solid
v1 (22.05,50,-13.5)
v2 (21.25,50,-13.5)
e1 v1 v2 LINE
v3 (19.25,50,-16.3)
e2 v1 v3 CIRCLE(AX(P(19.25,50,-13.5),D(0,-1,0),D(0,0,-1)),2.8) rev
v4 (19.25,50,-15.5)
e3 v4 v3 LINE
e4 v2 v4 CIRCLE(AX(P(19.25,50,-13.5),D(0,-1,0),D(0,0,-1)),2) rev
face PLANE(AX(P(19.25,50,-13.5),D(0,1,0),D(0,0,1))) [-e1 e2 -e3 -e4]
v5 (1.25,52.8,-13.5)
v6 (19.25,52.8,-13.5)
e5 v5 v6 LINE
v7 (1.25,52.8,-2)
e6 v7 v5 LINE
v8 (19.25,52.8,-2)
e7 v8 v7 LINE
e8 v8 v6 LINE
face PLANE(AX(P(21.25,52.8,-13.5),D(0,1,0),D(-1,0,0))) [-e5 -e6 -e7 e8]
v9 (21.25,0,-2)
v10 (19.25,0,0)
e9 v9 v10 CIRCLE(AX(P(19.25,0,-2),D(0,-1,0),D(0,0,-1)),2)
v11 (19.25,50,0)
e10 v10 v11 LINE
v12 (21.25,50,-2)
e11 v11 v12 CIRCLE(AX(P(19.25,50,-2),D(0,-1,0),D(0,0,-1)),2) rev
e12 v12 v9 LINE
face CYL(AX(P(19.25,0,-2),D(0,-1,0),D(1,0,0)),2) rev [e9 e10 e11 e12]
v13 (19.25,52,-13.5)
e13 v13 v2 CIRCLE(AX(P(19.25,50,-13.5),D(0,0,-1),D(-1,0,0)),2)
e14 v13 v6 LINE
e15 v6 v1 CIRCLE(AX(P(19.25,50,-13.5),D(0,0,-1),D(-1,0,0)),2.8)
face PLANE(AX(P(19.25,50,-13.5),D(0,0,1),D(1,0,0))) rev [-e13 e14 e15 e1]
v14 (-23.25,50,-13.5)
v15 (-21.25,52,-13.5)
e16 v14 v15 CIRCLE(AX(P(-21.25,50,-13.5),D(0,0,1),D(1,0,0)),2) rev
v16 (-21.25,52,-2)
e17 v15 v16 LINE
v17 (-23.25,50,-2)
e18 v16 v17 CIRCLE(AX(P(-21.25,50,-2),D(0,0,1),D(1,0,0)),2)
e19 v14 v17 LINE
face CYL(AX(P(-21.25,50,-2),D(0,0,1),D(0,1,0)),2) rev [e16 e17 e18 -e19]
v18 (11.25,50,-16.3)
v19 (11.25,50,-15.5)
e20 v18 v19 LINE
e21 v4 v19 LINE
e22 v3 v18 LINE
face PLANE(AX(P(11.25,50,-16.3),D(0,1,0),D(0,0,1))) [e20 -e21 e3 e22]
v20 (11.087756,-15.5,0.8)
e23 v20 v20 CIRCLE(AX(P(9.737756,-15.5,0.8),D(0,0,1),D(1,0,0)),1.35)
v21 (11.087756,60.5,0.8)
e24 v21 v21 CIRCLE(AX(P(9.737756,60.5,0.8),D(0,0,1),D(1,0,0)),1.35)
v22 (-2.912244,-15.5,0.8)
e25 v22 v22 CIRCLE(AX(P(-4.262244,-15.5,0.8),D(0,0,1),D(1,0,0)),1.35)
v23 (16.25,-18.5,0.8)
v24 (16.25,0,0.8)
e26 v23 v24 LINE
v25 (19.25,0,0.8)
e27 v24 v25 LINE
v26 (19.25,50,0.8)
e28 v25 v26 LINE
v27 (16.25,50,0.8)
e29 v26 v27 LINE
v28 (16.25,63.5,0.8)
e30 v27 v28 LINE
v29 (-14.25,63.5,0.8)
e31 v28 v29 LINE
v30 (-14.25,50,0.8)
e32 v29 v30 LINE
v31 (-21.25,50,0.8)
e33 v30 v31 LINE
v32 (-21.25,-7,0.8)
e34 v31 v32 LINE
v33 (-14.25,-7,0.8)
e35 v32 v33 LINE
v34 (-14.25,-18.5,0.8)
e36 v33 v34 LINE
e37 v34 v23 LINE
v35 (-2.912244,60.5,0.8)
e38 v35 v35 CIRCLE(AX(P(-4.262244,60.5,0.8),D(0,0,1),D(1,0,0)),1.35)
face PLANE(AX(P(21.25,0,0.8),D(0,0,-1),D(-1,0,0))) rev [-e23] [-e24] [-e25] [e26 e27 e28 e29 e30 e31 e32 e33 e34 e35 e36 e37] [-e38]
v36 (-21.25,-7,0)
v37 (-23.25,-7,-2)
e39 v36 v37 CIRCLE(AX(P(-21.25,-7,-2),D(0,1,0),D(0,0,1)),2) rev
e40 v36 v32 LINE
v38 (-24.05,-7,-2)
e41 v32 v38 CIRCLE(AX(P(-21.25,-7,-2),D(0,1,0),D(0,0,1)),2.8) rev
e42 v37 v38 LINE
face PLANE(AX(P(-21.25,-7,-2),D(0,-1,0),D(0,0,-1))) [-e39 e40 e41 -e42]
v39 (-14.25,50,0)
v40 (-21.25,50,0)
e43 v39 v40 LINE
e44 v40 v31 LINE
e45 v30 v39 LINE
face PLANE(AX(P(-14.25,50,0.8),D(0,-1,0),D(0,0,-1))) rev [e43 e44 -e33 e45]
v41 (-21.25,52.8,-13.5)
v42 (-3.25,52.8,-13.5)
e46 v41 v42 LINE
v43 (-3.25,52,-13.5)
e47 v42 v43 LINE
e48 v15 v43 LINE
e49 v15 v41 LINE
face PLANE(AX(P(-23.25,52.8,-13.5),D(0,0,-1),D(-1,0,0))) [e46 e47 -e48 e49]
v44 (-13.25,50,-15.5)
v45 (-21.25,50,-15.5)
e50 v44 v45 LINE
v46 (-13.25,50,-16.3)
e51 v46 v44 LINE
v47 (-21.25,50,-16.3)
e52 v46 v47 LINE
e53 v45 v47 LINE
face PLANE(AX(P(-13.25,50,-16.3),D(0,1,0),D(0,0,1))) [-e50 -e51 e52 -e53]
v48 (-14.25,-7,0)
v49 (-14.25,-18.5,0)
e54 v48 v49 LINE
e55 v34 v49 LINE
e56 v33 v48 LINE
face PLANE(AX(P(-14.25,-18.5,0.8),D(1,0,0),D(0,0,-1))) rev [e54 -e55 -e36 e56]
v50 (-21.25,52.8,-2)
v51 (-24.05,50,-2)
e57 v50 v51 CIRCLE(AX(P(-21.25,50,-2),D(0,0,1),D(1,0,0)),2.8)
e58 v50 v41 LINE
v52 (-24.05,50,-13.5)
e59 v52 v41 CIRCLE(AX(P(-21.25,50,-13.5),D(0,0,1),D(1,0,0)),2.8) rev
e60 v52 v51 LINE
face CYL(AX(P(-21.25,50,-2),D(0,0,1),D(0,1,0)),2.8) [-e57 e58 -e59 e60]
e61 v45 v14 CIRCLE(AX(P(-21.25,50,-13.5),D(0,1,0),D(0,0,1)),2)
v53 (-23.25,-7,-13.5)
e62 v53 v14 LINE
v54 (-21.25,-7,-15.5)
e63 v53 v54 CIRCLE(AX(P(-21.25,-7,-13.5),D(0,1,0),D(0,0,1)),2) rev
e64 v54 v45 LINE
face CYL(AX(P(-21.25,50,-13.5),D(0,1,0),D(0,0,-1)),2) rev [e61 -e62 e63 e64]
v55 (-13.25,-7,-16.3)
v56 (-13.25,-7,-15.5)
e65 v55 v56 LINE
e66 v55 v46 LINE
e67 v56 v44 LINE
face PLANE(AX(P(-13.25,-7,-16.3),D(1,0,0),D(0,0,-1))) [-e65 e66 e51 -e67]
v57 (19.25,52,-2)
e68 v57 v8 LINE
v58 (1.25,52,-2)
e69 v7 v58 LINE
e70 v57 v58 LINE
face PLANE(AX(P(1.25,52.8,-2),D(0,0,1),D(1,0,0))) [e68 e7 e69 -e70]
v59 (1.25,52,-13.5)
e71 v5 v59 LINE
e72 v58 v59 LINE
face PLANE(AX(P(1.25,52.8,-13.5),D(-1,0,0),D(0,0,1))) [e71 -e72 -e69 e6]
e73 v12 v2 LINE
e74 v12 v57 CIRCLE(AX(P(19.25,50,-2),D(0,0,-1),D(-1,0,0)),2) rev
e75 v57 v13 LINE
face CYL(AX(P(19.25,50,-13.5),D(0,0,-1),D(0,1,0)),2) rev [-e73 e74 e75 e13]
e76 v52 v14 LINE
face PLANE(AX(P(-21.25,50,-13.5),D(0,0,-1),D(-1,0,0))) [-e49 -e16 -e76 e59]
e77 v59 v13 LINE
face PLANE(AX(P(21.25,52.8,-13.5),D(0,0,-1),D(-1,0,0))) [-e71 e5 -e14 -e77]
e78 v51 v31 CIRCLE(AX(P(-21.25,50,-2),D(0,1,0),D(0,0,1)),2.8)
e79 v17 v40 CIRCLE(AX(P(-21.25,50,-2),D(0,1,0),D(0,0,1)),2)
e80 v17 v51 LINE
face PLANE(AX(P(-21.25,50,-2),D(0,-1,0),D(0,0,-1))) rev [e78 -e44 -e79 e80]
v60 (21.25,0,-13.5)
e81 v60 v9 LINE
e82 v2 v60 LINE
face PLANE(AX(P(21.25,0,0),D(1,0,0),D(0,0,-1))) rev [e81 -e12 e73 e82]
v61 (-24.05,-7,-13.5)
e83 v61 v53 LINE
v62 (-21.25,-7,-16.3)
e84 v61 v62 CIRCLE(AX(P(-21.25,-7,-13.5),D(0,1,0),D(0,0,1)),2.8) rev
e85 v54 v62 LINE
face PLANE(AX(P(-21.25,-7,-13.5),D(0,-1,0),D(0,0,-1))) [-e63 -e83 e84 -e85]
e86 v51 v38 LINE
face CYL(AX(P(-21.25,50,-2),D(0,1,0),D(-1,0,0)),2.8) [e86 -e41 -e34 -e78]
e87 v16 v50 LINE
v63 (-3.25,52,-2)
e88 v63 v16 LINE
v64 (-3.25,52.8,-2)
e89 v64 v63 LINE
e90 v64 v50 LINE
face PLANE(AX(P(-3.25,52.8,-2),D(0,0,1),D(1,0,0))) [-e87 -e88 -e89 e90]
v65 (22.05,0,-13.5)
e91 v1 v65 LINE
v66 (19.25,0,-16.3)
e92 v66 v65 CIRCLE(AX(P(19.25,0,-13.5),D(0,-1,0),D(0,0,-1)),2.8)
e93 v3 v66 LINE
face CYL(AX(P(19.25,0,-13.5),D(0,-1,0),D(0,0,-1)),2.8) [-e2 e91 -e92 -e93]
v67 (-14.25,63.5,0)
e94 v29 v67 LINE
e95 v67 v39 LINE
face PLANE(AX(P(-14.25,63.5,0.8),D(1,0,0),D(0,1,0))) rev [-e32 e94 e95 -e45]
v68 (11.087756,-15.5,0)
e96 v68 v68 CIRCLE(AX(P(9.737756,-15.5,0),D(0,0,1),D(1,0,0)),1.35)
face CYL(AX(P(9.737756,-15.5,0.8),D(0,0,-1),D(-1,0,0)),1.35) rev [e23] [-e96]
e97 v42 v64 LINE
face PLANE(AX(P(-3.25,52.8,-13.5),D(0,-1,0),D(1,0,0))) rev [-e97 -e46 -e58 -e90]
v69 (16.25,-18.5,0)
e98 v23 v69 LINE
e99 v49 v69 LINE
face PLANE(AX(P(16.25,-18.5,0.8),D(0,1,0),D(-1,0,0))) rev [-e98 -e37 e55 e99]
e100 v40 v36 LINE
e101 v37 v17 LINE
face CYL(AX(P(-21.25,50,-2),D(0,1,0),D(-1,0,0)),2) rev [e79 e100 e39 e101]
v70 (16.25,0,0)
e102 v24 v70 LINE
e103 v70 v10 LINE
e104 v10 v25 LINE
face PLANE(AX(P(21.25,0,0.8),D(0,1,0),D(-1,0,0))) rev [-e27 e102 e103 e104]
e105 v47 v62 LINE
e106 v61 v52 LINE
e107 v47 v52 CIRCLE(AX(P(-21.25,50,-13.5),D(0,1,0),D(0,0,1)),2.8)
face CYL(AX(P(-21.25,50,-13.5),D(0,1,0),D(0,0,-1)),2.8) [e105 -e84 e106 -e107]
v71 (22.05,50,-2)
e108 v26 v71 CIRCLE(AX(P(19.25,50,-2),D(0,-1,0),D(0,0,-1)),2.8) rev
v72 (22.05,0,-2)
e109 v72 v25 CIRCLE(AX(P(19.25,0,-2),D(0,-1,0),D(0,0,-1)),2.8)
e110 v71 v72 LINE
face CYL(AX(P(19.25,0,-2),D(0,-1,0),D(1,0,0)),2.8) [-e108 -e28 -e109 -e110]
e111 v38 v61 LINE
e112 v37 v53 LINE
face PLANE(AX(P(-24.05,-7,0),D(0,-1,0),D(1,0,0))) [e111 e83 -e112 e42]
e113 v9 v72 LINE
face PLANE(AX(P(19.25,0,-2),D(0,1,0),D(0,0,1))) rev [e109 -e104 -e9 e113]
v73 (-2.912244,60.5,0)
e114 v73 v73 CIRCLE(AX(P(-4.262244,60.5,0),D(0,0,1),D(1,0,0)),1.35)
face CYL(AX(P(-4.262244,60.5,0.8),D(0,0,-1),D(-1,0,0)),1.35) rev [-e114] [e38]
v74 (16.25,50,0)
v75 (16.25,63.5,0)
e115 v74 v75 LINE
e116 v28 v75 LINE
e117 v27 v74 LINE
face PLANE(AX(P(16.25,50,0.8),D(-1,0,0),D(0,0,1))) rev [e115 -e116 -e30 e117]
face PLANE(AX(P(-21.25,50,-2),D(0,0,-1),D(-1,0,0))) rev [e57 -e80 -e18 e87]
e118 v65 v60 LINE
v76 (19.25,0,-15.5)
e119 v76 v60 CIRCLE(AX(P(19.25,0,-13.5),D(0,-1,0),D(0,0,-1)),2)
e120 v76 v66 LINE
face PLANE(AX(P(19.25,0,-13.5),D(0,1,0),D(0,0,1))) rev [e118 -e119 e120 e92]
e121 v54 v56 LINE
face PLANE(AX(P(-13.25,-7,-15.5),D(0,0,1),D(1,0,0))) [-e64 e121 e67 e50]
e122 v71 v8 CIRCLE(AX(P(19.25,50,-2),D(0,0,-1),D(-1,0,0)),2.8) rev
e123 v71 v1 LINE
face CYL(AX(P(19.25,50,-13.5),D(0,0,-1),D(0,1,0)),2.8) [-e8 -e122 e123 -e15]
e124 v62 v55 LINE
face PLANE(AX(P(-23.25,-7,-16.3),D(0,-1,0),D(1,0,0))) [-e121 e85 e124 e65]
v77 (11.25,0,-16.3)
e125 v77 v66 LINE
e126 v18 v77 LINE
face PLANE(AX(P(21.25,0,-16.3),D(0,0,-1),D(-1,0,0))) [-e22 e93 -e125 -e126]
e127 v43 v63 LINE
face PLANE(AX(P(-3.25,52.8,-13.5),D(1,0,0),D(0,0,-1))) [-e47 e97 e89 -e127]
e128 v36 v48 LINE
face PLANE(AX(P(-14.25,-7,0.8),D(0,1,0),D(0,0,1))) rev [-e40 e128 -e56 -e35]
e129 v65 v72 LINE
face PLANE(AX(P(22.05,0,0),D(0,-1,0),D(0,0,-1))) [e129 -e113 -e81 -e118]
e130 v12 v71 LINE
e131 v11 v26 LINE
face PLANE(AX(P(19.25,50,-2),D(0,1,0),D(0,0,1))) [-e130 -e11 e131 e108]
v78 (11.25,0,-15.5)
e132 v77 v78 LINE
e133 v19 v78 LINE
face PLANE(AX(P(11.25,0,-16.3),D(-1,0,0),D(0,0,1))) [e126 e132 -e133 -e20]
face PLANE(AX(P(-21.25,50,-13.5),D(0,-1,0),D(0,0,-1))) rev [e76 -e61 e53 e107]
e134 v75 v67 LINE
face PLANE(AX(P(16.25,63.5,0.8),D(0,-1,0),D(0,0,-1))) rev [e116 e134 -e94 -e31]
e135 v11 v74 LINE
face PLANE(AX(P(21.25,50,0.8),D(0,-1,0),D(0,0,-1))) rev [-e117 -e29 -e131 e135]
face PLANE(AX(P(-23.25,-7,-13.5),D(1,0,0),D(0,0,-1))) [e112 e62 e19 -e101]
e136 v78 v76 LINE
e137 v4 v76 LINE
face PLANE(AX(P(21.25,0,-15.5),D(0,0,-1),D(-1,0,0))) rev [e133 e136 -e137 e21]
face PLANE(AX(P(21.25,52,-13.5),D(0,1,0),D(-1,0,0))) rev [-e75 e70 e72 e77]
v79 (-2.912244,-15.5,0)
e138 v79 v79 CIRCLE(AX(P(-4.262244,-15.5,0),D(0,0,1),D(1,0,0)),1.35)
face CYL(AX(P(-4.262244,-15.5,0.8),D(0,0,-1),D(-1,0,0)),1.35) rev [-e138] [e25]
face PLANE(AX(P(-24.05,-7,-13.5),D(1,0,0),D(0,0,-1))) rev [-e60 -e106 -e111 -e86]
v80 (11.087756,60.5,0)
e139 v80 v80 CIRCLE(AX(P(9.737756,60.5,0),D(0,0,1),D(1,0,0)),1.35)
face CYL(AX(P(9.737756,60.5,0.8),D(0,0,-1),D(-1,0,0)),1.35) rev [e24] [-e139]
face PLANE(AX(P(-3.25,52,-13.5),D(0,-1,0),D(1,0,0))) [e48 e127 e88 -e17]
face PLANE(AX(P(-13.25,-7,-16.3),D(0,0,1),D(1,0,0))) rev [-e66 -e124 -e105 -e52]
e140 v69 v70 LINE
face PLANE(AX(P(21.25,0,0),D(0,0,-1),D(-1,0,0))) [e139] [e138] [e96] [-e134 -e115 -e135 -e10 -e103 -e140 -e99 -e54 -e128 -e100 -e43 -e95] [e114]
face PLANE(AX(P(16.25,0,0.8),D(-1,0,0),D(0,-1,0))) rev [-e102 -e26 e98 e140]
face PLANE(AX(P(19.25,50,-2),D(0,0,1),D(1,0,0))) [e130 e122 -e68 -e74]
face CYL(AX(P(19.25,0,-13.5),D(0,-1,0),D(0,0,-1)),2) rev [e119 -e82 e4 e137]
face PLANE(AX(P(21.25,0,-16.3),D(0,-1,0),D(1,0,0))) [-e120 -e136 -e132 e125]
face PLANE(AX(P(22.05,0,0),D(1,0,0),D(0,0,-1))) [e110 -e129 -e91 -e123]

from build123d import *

# Parameters (mm, degrees)
SKETCH1_R                      = 1.35
BASE_FLANGE1_DEPTH             = 0.8
EDGE_FLANGE1_STRIP_W           = 7.2
EDGE_FLANGE1_STRIP_H           = 0.8
EDGE_FLANGE1_STRIP_CUT_DEPTH   = 50
EDGE_FLANGE1_STRIP_2_W         = 7.2
EDGE_FLANGE1_STRIP_2_H         = 0.8
EDGE_FLANGE1_STRIP_CUT_2_DEPTH = 57
EDGE_FLANGE1_DEPTH             = 50
EDGE_FLANGE1_BEND_DEPTH        = 57
EDGE_FLANGE4_DEPTH             = 11.5
EDGE_FLANGE4_BEND_DEPTH        = 11.5
EDGE_FLANGE5_DEPTH             = 50
EDGE_FLANGE5_BEND_DEPTH        = 57


# Sheet-metal steps are written as plain solids
with BuildPart() as part:
    # Sketch1 → Base-Flange1 (new body)
    with BuildSketch(Plane.XY):
        Polygon((16.25, 0), (16.25, -18.5), (-14.25, -18.5), (-14.25, -7), (-23.25, -7), (-23.25, 50), (-14.25, 50), (-14.25, 63.5), (16.25, 63.5), (16.25, 50), (21.25, 50), (21.25, 0), align=None)
        with Locations((9.737756115, -15.5)):
            Circle(SKETCH1_R, mode=Mode.SUBTRACT)
        with Locations((-4.262243885, -15.5)):
            Circle(SKETCH1_R, mode=Mode.SUBTRACT)
        with Locations((9.737756115, 60.5)):
            Circle(SKETCH1_R, mode=Mode.SUBTRACT)
        with Locations((-4.262243885, 60.5)):
            Circle(SKETCH1_R, mode=Mode.SUBTRACT)
    extrude(amount=BASE_FLANGE1_DEPTH)

    # Edge-Flange1 strip (across the edge) → Edge-Flange1 strip cut (cut)
    with BuildSketch(Plane(origin=(21.25, 50, 0), x_dir=(-1, 0, 0), z_dir=(0, -1, 0))):
        with Locations((-1.6, -0.4)):
            Rectangle(EDGE_FLANGE1_STRIP_W, EDGE_FLANGE1_STRIP_H)
    extrude(amount=EDGE_FLANGE1_STRIP_CUT_DEPTH, mode=Mode.SUBTRACT)

    # Edge-Flange1 strip 2 (across the edge) → Edge-Flange1 strip cut 2 (cut)
    with BuildSketch(Plane(origin=(-23.25, -7, 0), x_dir=(1, 0, 0), z_dir=(0, 1, 0))):
        with Locations((-1.6, -0.4)):
            Rectangle(EDGE_FLANGE1_STRIP_2_W, EDGE_FLANGE1_STRIP_2_H)
    extrude(amount=EDGE_FLANGE1_STRIP_CUT_2_DEPTH, mode=Mode.SUBTRACT)

    # Edge-Flange1 section (across the edge) → Edge-Flange1 (add)
    with BuildSketch(Plane(origin=(21.25, 50, 0), x_dir=(-1, 0, 0), z_dir=(0, -1, 0))):
        with BuildLine():
            Line((-0.8, 2), (-0.8, 13.5))
            Line((-0.8, 13.5), (0, 13.5))
            Line((0, 13.5), (0, 2))
            ThreePointArc((0, 2), (0.585786438, 0.585786438), (2, 0))
            Line((2, 0), (2, -0.8))
            ThreePointArc((2, -0.8), (0.020101013, 0.020101013), (-0.8, 2))
        make_face()
    extrude(amount=EDGE_FLANGE1_DEPTH)

    # Edge-Flange1 section 2 (across the edge) → Edge-Flange1 bend (add)
    with BuildSketch(Plane(origin=(-23.25, -7, 0), x_dir=(1, 0, 0), z_dir=(0, 1, 0))):
        with BuildLine():
            Line((-0.8, 2), (-0.8, 13.5))
            Line((-0.8, 13.5), (0, 13.5))
            Line((0, 13.5), (0, 2))
            ThreePointArc((0, 2), (0.585786438, 0.585786438), (2, 0))
            Line((2, 0), (2, -0.8))
            ThreePointArc((2, -0.8), (0.020101013, 0.020101013), (-0.8, 2))
        make_face()
    extrude(amount=EDGE_FLANGE1_BEND_DEPTH)

    # Edge-Flange4 section (across the edge) → Edge-Flange4 (add)
    with BuildSketch(Plane(origin=(21.25, 52, -2), x_dir=(0, -1, 0), z_dir=(0, 0, -1))):
        with BuildLine():
            Line((-0.8, 2), (-0.8, 20))
            Line((-0.8, 20), (0, 20))
            Line((0, 20), (0, 2))
            ThreePointArc((0, 2), (0.585786438, 0.585786438), (2, 0))
            Line((2, 0), (2, -0.8))
            ThreePointArc((2, -0.8), (0.020101013, 0.020101013), (-0.8, 2))
        make_face()
    extrude(amount=EDGE_FLANGE4_DEPTH)

    # Edge-Flange4 section 2 (across the edge) → Edge-Flange4 bend (add)
    with BuildSketch(Plane(origin=(-23.25, 52, -13.5), x_dir=(0, -1, 0), z_dir=(0, 0, 1))):
        with BuildLine():
            Line((-0.8, 2), (-0.8, 20))
            Line((-0.8, 20), (0, 20))
            Line((0, 20), (0, 2))
            ThreePointArc((0, 2), (0.585786438, 0.585786438), (2, 0))
            Line((2, 0), (2, -0.8))
            ThreePointArc((2, -0.8), (0.020101013, 0.020101013), (-0.8, 2))
        make_face()
    extrude(amount=EDGE_FLANGE4_BEND_DEPTH)

    # Edge-Flange5 section (across the edge) → Edge-Flange5 (add)
    with BuildSketch(Plane(origin=(21.25, 50, -15.5), x_dir=(0, 0, 1), z_dir=(0, -1, 0))):
        with BuildLine():
            Line((-0.8, 2), (-0.8, 10))
            Line((-0.8, 10), (0, 10))
            Line((0, 10), (0, 2))
            ThreePointArc((0, 2), (0.585786438, 0.585786438), (2, 0))
            Line((2, 0), (2, -0.8))
            ThreePointArc((2, -0.8), (0.020101013, 0.020101013), (-0.8, 2))
        make_face()
    extrude(amount=EDGE_FLANGE5_DEPTH)

    # Edge-Flange5 section 2 (across the edge) → Edge-Flange5 bend (add)
    with BuildSketch(Plane(origin=(-23.25, -7, -15.5), x_dir=(0, 0, 1), z_dir=(0, 1, 0))):
        with BuildLine():
            Line((-0.8, 2), (-0.8, 10))
            Line((-0.8, 10), (0, 10))
            Line((0, 10), (0, 2))
            ThreePointArc((0, 2), (0.585786438, 0.585786438), (2, 0))
            Line((2, 0), (2, -0.8))
            ThreePointArc((2, -0.8), (0.020101013, 0.020101013), (-0.8, 2))
        make_face()
    extrude(amount=EDGE_FLANGE5_BEND_DEPTH)


solid = part.part
